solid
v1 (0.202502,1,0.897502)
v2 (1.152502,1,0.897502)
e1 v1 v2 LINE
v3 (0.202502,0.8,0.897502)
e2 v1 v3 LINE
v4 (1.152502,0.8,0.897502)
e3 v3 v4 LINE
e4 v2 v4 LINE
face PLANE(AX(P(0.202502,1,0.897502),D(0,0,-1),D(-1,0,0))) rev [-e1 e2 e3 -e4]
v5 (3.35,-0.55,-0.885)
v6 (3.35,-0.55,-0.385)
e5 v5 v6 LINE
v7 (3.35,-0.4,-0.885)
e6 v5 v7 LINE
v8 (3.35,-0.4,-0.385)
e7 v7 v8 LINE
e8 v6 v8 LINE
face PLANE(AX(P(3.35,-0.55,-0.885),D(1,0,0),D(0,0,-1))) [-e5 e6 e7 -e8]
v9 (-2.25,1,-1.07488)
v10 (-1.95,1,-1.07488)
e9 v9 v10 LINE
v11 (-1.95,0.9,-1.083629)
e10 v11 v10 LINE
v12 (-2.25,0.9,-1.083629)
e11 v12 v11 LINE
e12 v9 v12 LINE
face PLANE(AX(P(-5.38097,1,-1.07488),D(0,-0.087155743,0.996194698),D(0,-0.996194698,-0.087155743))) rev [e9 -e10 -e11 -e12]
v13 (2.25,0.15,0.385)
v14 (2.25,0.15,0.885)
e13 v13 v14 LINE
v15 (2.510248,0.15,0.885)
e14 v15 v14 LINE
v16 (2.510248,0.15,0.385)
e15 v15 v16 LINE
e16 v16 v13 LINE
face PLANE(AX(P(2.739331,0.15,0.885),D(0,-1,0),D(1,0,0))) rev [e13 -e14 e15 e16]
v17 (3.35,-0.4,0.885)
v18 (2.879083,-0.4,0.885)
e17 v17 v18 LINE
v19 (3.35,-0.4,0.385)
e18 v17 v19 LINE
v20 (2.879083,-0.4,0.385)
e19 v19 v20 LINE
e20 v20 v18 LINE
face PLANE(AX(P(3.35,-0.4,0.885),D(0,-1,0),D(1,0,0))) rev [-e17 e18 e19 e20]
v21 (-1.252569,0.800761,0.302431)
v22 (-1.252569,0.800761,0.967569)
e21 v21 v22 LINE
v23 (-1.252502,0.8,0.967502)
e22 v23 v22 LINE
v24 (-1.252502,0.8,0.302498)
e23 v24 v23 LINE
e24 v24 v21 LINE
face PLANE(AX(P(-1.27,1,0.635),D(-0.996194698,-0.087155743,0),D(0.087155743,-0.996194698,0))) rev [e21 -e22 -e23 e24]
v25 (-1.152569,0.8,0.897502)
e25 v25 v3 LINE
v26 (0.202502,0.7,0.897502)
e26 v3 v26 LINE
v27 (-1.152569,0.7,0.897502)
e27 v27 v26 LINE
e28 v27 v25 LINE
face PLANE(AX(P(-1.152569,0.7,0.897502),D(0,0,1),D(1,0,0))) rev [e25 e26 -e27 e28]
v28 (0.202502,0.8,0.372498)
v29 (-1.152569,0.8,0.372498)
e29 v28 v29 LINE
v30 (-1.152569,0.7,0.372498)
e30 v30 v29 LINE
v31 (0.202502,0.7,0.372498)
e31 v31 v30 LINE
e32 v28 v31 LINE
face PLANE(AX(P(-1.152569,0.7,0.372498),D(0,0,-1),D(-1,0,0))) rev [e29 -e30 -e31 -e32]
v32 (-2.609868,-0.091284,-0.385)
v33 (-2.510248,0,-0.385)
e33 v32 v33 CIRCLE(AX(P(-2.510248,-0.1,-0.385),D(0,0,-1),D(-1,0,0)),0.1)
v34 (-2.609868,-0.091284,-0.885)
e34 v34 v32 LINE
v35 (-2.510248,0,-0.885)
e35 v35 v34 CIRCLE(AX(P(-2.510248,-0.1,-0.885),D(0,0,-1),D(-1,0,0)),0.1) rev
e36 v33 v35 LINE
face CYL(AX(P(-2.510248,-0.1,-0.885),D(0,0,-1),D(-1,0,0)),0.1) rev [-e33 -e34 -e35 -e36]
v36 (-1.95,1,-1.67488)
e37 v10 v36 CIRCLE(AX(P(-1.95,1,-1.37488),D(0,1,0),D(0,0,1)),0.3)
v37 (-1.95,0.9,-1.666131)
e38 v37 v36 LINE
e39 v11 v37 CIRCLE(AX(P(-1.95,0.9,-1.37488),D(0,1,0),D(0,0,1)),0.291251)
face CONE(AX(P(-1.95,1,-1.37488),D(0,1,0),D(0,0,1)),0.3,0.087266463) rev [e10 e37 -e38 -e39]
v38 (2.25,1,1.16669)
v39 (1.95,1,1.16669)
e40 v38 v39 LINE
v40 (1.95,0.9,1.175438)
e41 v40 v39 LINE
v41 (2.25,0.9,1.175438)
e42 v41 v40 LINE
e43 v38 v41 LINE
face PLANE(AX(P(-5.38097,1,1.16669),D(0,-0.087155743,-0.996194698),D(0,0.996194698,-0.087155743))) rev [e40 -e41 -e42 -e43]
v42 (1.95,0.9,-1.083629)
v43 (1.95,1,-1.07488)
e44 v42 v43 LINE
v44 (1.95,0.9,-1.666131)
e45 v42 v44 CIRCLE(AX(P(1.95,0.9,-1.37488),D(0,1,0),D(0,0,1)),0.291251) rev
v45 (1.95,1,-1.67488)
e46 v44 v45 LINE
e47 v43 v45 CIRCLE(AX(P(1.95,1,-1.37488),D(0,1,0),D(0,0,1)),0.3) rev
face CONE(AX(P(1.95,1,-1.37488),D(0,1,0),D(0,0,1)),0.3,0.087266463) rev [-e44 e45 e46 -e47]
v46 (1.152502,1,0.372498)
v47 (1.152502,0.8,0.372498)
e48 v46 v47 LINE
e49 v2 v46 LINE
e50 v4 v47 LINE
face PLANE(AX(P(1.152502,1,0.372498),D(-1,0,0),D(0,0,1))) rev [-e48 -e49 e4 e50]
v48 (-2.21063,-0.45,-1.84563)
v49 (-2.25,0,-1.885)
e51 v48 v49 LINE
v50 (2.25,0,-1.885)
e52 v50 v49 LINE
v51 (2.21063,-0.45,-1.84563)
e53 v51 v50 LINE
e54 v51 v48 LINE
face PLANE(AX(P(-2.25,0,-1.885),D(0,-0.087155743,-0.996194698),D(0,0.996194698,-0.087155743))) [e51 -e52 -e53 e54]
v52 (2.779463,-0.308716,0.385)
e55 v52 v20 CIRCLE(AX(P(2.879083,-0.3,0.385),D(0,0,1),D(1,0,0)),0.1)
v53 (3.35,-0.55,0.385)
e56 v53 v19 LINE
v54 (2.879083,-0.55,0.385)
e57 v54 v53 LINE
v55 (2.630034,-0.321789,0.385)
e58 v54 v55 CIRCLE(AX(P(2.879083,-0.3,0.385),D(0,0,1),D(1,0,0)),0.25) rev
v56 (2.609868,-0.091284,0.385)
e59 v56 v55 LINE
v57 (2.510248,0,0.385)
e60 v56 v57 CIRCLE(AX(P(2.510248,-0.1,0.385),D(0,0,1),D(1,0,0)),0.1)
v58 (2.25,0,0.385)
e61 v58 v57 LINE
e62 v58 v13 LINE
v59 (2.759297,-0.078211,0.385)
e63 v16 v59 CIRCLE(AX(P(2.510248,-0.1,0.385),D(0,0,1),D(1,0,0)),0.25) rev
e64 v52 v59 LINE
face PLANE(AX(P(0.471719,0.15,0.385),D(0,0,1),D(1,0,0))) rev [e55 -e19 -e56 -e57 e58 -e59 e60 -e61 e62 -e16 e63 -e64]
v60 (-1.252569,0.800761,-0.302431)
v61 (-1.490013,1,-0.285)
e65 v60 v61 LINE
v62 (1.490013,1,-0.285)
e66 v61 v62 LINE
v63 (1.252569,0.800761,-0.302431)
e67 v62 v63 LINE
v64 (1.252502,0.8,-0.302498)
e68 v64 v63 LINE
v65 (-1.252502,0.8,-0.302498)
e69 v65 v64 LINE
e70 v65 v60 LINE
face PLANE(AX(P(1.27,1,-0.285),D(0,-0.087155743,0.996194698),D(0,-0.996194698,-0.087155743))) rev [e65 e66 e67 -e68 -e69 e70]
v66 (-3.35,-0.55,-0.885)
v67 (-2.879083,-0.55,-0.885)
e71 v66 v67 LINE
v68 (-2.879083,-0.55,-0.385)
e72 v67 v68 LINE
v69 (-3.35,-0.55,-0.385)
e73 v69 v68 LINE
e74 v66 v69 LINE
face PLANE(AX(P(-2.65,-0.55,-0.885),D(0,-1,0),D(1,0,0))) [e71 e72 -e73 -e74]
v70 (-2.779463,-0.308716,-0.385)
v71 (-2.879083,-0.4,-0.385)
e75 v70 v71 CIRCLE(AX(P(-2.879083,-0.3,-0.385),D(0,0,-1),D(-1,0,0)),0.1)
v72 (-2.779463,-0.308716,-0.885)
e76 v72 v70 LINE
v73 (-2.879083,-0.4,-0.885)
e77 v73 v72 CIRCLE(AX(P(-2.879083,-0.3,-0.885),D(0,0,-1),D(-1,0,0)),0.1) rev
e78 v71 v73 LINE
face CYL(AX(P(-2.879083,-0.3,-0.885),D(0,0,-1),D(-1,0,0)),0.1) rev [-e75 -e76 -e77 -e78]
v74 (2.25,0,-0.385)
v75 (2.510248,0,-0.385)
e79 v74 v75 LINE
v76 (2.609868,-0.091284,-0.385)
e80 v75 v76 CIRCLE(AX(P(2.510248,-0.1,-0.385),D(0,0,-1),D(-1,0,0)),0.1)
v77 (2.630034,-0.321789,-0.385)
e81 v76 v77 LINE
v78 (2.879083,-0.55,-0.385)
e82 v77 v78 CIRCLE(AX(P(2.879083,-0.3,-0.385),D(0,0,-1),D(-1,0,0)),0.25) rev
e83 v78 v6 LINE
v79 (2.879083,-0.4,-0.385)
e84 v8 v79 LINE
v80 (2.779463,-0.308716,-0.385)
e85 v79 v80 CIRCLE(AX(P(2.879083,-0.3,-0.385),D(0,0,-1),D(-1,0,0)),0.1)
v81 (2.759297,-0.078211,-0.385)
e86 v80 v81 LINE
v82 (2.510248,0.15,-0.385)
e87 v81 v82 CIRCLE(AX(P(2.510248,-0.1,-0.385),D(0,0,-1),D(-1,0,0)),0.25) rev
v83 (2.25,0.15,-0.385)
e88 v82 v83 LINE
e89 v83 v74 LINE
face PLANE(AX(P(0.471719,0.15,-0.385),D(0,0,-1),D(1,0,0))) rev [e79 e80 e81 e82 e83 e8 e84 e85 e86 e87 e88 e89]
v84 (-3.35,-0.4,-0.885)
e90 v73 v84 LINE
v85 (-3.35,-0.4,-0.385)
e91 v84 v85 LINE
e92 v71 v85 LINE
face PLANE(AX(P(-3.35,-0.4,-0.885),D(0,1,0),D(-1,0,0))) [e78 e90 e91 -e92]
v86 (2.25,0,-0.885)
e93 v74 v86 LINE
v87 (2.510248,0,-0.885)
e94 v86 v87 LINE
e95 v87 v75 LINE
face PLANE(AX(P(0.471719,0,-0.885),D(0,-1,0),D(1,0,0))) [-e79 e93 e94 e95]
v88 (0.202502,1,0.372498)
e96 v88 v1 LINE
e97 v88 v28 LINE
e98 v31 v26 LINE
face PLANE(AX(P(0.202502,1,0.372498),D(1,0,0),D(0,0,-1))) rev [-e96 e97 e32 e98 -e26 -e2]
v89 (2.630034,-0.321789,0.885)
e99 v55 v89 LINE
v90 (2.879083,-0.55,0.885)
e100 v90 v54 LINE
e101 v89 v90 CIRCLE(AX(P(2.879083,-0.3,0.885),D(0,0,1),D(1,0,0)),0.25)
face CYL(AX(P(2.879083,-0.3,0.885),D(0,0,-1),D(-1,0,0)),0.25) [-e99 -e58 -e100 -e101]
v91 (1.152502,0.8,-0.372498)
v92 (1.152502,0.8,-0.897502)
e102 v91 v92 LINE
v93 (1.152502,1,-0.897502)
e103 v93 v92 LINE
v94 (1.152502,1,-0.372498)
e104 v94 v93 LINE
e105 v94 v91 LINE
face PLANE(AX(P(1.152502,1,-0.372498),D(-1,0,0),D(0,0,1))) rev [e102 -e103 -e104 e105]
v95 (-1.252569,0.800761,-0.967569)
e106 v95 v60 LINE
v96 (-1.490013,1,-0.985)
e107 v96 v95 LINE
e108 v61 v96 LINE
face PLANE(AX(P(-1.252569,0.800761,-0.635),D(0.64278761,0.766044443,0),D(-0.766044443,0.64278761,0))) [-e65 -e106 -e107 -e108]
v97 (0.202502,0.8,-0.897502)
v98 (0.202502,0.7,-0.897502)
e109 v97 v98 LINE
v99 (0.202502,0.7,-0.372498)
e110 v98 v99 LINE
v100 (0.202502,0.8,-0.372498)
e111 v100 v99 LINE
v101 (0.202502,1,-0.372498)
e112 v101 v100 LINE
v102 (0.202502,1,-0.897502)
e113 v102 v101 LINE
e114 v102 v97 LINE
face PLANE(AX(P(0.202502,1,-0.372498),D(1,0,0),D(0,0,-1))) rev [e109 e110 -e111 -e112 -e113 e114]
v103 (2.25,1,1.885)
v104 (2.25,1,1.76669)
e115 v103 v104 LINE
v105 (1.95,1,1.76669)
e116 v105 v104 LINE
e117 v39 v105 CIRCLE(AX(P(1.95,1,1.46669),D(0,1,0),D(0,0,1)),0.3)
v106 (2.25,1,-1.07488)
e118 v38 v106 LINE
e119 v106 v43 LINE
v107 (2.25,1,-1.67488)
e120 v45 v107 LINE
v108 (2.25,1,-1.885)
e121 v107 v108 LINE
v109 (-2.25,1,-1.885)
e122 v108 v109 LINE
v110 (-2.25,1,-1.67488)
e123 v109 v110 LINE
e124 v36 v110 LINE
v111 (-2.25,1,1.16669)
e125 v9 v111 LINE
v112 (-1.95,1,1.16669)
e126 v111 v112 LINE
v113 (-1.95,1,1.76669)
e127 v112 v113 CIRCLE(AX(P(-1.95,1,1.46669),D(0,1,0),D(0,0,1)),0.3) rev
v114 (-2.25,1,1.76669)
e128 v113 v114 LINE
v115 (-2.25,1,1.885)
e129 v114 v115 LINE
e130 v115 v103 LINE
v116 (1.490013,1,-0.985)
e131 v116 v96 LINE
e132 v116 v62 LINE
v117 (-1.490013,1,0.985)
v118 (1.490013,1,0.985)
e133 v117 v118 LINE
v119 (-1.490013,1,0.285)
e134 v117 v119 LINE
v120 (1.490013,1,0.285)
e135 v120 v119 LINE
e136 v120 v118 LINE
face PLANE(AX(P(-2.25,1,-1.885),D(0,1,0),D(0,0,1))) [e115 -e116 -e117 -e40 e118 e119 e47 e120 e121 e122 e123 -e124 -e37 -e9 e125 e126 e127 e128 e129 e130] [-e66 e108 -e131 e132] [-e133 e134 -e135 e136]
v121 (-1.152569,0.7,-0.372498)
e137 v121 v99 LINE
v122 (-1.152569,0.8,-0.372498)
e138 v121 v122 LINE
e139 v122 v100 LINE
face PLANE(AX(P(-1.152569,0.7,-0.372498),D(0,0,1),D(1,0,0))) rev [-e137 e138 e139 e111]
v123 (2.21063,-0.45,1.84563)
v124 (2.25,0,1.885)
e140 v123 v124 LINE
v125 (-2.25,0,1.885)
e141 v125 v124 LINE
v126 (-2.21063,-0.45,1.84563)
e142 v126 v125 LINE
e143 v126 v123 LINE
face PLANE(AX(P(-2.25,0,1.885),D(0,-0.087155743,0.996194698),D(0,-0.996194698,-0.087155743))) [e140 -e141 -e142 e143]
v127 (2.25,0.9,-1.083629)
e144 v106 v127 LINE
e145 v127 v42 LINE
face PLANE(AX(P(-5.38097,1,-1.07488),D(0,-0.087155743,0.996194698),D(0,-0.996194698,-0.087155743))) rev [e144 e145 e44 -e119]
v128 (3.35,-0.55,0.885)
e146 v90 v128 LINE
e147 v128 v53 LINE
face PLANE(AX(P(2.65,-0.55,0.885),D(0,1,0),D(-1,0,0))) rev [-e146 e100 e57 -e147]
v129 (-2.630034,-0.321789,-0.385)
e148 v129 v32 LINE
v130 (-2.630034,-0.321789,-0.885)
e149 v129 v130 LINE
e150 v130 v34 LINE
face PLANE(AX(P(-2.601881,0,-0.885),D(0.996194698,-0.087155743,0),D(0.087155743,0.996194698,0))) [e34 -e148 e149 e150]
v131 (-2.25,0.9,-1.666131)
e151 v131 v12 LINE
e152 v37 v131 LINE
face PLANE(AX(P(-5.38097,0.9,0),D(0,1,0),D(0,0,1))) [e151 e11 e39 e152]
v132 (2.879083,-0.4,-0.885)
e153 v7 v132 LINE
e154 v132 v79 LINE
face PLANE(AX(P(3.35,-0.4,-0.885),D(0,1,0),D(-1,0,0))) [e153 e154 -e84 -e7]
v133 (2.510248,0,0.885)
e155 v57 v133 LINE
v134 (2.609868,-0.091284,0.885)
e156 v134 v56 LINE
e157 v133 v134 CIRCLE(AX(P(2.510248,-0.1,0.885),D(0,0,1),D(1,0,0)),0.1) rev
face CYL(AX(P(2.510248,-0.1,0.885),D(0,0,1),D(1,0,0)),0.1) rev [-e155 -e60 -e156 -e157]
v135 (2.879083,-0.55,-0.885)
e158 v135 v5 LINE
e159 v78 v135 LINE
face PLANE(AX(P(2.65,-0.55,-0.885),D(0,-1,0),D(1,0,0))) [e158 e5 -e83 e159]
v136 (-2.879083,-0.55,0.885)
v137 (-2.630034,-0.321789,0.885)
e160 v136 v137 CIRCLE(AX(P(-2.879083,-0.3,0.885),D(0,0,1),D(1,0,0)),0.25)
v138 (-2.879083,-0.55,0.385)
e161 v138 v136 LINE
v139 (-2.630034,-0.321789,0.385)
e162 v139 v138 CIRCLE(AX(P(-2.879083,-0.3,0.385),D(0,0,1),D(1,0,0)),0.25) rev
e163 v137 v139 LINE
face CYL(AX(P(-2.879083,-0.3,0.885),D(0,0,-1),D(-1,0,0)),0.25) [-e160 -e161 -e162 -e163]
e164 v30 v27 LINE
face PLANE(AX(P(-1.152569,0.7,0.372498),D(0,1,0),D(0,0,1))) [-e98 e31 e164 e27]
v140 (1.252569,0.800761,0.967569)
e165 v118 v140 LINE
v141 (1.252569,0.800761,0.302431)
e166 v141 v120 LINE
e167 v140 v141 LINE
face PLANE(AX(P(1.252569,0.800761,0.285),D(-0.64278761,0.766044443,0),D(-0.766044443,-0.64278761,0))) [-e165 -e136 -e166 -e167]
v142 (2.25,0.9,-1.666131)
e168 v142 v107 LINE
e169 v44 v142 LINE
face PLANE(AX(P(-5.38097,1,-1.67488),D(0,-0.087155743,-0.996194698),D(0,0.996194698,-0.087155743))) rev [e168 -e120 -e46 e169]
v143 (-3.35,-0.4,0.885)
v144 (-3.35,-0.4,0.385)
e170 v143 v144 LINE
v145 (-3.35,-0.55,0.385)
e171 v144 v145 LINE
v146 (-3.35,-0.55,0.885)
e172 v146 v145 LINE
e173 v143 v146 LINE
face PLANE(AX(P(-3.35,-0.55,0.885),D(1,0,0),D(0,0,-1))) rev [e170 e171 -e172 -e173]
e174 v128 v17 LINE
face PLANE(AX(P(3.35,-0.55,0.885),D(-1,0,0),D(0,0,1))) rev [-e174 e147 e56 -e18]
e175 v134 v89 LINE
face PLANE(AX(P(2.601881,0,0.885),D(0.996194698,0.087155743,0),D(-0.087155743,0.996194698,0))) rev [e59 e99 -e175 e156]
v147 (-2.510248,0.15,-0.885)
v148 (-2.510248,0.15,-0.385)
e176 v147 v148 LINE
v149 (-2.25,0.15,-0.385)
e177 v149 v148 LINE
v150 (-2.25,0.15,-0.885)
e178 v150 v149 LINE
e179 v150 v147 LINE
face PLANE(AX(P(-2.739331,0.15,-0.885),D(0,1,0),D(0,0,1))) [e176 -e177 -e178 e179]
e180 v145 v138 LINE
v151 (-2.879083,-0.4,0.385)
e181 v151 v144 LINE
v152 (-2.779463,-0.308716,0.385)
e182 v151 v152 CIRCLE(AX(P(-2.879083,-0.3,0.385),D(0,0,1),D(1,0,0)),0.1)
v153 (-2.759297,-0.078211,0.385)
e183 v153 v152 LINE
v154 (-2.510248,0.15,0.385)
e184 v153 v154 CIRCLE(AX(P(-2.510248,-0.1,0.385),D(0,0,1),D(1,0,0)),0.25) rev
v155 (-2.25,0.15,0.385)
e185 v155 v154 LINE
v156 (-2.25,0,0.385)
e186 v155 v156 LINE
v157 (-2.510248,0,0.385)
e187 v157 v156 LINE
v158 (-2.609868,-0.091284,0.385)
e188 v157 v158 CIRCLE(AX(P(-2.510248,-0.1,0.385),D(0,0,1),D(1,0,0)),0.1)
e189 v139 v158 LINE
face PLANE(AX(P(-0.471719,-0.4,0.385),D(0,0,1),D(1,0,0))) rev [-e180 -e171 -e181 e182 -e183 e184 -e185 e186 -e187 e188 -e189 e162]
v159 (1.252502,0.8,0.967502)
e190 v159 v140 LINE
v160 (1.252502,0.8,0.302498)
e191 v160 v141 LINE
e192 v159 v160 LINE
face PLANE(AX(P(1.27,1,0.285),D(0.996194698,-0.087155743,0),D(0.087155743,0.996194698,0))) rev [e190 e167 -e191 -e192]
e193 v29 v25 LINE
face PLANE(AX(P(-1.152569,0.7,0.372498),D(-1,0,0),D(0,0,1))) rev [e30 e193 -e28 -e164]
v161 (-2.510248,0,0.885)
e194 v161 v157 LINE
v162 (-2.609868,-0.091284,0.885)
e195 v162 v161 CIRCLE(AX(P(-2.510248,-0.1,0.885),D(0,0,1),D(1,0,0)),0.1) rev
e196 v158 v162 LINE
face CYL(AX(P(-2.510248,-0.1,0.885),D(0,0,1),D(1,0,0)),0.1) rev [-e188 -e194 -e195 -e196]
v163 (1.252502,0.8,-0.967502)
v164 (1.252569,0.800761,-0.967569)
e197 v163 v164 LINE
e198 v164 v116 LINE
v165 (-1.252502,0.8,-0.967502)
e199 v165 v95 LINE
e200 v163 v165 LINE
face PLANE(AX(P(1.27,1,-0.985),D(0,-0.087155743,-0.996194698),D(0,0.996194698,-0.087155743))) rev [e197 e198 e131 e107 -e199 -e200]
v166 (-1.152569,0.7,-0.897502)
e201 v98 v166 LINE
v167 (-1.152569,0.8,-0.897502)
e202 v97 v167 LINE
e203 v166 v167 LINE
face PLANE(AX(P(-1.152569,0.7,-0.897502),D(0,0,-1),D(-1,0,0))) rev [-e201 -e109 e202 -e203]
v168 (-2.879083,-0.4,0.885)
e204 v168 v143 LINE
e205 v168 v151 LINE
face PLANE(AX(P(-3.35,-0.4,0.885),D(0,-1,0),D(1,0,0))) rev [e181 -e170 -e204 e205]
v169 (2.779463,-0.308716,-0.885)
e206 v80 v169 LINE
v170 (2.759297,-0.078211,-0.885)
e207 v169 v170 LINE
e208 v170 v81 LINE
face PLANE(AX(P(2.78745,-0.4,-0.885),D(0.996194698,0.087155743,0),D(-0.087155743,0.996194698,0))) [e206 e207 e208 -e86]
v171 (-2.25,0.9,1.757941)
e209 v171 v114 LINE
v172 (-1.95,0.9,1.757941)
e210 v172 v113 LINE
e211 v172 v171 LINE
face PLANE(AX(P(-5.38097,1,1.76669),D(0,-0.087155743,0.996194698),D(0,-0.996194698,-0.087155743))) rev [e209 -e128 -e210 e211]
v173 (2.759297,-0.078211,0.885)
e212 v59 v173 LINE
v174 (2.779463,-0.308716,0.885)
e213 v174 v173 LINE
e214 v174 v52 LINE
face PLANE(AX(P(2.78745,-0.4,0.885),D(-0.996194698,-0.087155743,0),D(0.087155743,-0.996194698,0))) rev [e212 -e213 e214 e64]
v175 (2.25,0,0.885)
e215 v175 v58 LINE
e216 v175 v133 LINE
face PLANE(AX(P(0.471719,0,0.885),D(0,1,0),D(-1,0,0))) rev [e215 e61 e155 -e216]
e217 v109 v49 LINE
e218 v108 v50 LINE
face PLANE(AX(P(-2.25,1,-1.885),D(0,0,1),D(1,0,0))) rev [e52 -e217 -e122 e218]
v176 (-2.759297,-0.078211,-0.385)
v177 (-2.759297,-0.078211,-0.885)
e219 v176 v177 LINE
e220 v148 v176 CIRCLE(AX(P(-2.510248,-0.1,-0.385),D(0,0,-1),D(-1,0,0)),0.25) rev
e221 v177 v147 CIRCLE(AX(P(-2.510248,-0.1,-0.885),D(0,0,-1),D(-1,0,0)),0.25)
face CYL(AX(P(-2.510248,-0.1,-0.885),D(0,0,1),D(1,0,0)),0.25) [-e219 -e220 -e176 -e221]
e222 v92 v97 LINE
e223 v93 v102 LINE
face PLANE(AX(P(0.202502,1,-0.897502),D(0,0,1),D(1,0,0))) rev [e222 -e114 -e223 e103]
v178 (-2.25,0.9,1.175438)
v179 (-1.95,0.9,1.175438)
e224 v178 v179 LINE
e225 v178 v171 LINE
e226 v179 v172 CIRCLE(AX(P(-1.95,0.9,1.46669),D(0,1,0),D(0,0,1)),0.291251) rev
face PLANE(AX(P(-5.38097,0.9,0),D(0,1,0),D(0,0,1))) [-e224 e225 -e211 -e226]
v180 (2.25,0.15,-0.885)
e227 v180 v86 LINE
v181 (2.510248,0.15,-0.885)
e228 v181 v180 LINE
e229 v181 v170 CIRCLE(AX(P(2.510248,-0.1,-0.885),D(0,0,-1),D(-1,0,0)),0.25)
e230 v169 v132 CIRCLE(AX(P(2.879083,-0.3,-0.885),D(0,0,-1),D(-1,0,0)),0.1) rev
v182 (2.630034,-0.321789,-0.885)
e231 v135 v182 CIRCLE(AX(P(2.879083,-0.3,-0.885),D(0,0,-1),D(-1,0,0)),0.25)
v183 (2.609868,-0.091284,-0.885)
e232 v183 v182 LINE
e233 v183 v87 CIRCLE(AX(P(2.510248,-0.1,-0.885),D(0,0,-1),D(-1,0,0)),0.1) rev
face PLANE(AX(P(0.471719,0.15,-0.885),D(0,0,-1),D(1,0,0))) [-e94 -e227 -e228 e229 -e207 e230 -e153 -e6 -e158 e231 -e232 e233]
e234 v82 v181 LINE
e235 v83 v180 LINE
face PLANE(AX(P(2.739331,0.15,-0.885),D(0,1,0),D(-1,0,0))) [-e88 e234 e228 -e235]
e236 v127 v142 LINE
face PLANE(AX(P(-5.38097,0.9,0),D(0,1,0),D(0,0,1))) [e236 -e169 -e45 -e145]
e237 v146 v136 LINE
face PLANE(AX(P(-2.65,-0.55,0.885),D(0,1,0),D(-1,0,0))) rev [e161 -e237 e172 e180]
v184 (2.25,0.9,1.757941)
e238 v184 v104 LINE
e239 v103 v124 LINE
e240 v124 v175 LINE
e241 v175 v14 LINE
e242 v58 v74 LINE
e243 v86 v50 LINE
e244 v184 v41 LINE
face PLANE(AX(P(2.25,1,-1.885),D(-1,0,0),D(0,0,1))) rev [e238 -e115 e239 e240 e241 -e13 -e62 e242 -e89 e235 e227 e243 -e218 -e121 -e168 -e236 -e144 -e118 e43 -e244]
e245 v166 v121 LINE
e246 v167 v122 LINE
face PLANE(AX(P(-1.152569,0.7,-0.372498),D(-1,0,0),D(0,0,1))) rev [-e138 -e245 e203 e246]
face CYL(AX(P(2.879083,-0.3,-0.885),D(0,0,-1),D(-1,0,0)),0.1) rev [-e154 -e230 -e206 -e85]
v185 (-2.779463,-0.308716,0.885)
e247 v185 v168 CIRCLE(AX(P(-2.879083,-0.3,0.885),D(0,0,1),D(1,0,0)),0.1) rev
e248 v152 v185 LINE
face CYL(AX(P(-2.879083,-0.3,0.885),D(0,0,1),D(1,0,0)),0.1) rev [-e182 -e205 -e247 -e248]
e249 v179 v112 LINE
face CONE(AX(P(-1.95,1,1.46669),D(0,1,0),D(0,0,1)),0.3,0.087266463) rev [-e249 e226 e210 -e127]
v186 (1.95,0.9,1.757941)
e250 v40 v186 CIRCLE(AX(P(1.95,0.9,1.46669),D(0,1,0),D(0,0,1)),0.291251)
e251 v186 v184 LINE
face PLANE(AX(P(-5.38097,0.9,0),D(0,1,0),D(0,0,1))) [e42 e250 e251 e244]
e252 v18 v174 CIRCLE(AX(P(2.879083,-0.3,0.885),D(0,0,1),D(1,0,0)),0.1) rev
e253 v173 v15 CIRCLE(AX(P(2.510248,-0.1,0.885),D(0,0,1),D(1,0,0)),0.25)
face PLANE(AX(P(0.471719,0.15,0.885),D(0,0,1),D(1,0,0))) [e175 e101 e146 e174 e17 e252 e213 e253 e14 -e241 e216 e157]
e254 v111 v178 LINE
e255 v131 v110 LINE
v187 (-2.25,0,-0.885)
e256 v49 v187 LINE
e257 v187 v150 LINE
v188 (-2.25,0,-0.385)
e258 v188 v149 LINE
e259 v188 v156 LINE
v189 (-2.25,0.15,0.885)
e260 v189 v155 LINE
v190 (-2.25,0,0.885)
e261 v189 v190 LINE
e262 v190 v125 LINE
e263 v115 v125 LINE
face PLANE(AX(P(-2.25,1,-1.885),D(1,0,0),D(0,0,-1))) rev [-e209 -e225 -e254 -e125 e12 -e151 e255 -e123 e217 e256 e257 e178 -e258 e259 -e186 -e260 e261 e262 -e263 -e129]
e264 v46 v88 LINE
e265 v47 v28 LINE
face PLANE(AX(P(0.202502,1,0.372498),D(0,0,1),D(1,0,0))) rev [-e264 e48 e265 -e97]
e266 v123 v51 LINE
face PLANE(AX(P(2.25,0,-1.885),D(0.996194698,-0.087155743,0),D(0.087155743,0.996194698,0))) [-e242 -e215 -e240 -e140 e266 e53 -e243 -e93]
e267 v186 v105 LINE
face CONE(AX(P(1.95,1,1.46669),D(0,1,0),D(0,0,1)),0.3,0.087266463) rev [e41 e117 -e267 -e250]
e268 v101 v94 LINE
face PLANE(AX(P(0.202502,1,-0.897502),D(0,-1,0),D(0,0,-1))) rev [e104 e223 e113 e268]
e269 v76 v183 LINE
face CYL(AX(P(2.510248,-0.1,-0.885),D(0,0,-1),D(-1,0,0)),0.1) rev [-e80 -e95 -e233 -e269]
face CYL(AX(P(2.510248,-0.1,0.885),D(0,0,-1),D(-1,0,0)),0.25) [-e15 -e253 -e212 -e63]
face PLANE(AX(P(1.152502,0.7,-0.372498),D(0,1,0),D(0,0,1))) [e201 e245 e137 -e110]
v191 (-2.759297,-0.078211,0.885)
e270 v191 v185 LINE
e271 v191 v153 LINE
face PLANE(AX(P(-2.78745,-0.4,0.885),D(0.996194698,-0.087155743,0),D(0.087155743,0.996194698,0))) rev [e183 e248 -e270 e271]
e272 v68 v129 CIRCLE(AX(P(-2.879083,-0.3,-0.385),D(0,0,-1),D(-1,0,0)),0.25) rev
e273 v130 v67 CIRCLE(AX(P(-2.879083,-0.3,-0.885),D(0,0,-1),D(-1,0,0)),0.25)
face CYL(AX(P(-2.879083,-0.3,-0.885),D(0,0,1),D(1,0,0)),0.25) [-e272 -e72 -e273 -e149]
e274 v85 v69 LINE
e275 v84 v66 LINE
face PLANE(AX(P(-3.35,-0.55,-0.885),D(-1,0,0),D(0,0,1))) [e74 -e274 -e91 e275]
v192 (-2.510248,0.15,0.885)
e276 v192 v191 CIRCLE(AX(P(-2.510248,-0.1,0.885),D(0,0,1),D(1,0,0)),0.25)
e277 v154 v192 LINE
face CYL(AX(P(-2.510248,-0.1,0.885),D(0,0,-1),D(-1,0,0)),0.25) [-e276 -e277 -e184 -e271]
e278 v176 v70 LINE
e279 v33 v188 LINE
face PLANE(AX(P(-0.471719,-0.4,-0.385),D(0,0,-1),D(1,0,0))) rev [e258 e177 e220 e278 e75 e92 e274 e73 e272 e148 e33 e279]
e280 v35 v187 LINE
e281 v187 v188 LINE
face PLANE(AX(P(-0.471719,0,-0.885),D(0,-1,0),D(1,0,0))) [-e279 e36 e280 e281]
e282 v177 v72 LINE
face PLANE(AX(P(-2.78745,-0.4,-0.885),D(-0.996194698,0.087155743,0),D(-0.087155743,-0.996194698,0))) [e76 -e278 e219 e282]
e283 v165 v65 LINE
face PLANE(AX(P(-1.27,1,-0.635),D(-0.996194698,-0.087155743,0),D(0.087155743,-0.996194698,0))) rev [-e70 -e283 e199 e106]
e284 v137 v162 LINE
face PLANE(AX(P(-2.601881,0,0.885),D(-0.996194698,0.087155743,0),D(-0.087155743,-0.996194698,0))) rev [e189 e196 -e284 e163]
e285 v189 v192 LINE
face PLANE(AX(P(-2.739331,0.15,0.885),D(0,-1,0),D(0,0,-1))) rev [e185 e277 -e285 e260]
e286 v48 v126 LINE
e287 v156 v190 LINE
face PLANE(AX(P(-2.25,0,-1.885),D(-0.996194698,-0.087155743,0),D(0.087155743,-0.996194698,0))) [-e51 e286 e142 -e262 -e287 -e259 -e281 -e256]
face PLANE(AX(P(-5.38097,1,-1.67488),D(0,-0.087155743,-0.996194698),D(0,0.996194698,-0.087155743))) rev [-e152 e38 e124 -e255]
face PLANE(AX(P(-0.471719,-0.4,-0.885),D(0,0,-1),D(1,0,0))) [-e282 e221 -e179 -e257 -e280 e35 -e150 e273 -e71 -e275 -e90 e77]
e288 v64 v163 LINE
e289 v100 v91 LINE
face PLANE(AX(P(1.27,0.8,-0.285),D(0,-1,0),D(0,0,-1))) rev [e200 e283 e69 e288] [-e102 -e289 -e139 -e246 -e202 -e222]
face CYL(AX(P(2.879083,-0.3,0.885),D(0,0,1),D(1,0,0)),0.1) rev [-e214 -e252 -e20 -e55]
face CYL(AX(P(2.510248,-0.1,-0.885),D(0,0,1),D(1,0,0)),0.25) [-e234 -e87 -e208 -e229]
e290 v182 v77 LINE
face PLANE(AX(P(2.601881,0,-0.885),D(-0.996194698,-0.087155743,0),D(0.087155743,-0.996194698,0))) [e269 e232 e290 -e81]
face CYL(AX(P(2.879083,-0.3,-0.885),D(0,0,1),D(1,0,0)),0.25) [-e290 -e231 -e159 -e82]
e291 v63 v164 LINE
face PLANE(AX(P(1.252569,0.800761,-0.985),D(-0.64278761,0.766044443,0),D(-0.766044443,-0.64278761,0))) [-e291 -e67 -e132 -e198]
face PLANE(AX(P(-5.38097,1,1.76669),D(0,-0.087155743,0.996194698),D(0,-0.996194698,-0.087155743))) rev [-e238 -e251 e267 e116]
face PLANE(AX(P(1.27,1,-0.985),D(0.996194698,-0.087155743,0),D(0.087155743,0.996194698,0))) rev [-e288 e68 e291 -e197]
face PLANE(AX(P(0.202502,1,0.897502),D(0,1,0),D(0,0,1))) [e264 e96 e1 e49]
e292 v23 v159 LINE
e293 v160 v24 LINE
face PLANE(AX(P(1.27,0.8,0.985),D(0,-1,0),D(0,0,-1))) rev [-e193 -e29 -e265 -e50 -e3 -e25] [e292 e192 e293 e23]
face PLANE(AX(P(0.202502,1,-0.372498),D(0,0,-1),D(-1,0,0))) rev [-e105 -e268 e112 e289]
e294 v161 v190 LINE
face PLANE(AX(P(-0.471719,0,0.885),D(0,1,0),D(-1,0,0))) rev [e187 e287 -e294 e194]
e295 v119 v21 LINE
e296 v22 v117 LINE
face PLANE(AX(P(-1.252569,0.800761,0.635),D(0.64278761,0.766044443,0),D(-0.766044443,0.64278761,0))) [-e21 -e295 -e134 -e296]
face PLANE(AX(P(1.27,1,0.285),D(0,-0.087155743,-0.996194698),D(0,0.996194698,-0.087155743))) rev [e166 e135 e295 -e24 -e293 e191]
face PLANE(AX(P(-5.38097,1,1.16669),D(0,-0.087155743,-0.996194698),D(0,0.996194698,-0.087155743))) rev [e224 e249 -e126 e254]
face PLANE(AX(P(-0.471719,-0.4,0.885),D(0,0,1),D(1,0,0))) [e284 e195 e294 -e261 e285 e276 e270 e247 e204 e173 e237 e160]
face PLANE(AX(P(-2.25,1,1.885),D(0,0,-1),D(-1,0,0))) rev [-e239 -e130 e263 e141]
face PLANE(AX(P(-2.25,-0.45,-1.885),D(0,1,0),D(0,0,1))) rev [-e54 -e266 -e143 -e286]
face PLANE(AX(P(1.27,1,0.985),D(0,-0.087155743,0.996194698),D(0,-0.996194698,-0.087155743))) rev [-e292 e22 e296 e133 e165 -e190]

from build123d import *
from OCP.BRepFilletAPI import BRepFilletAPI_MakeChamfer

# Parameters (mm, degrees)
SKETCH1_W                    = 4.5
SKETCH1_H                    = 3.77
EXTRUDE1_DEPTH               = 1
EXTRUDE1_OTHER_WAY_DEPTH     = 0.45
EXTRUDE1_OTHER_WAY_TAPER     = 5
EXTRUDE2_START               = 0.635
EXTRUDE2_DEPTH               = 0.25
FILLET1_R                    = 0.1
FILLET2_R                    = 0.25
CUT_EXTRUDE2_DEPTH           = 0.1
CUT_EXTRUDE2_DRAFT           = -5
CUT_EXTRUDE2_2_DEPTH         = 0.1
CUT_EXTRUDE2_2_DRAFT         = -5
CUT_EXTRUDE2_3_DEPTH         = 0.1
CUT_EXTRUDE2_3_DRAFT         = -5
CUT_EXTRUDE2_4_DEPTH         = 0.1
CUT_EXTRUDE2_4_DRAFT         = -5
CUT_EXTRUDE3_DEPTH           = 0.2
CUT_EXTRUDE3_DRAFT           = -5
CUT_EXTRUDE3_PROFILE_2_DEPTH = 0.2
CUT_EXTRUDE3_PROFILE_2_DRAFT = -5
CHAMFER1_SIZE                = 0.2
CHAMFER1_SIZE2               = 0.220012574
SKETCH5_W                    = 2.305071118
SKETCH5_H                    = 0.525004534
CUT_EXTRUDE4_DEPTH           = 0.1
SKETCH6_W                    = 0.95
SKETCH6_H                    = 0.525004534
EXTRUDE3_DEPTH               = 0.3


# Read off the part's stored shape, not the designer's step: Cut-Extrude2
with BuildPart() as part:
    # Sketch1 → Extrude1 (new body)
    with BuildSketch(Plane(origin=(0, 0, 0), x_dir=(1, 0, 0), z_dir=(0, 1, 0))):
        Rectangle(SKETCH1_W, SKETCH1_H)
    extrude(amount=EXTRUDE1_DEPTH)

    # Sketch1 → Extrude1 other way (add)
    with BuildSketch(Plane(origin=(0, 0, 0), x_dir=(1, 0, 0), z_dir=(0, 1, 0))):
        Rectangle(SKETCH1_W, SKETCH1_H)
    extrude(amount=-EXTRUDE1_OTHER_WAY_DEPTH, taper=EXTRUDE1_OTHER_WAY_TAPER)

    # Sketch2 → Extrude2 (add, symmetric)
    with BuildSketch(Plane.XY.offset(EXTRUDE2_START)):
        Polygon((-0.471718642, 0), (-2.601881235, 0), (-2.65, -0.55), (-3.35, -0.55), (-3.35, -0.4), (-2.787449676, -0.4), (-2.739330911, 0.15), (-0.471718642, 0.15), align=None)
        Polygon((0.471718642, 0.15), (0.471718642, 0), (2.601881235, 0), (2.65, -0.55), (3.35, -0.55), (3.35, -0.4), (2.787449676, -0.4), (2.739330911, 0.15), align=None)
    extrude2 = extrude(amount=EXTRUDE2_DEPTH, both=True)

    # Mirror1: Extrude2 across plane
    add(extrude2.mirror(Plane.XY))

    # Fillet1
    fillet1_edges = [part.edges().sort_by_distance(p)[0] for p in [
        (2.787449676, -0.4, -0.635),
        (2.601881235, 0, -0.635),
        (-2.787449676, -0.4, 0.635),
        (-2.601881235, 0, 0.635),
        (2.601881235, 0, 0.635),
        (2.787449676, -0.4, 0.635),
        (-2.601881235, 0, -0.635),
        (-2.787449676, -0.4, -0.635),
    ]]
    fillet(fillet1_edges, radius=FILLET1_R)

    # Fillet2
    fillet2_edges = [part.edges().sort_by_distance(p)[0] for p in [
        (2.739330911, 0.15, -0.635),
        (2.65, -0.55, -0.635),
        (-2.739330911, 0.15, 0.635),
        (-2.65, -0.55, 0.635),
        (2.739330911, 0.15, 0.635),
        (2.65, -0.55, 0.635),
        (-2.739330911, 0.15, -0.635),
        (-2.65, -0.55, -0.635),
    ]]
    fillet(fillet2_edges, radius=FILLET2_R)


with BuildPart() as cut_extrude2_tool:
    # Cut-Extrude2 outline → Cut-Extrude2 (with draft: the straight prism first)
    with BuildSketch(Plane(origin=(0, 0.9, 0), x_dir=(-1, 0, 0), z_dir=(0, 1, 0))):
        with BuildLine():
            Line((2.25, 1.175438394), (2.25, 1.757940661))
            Line((2.25, 1.757940661), (1.95, 1.757940661))
            ThreePointArc((1.95, 1.757940661), (1.658748866, 1.466689528), (1.95, 1.175438394))
            Line((1.95, 1.175438394), (2.25, 1.175438394))
        make_face()
    extrude(amount=CUT_EXTRUDE2_DEPTH)
    # Cut-Extrude2: the draft: its side faces are tilted about the plane it starts from
    cut_extrude2_sides = [cut_extrude2_tool.faces().sort_by_distance(p)[0] for p in [
        (-2.1, 0.95, 1.175438394),
        (-2.25, 0.95, 1.466689527),
        (-2.1, 0.95, 1.757940661),
        (-1.658748866, 0.95, 1.466689528),
    ]]
    draft(cut_extrude2_sides, Plane(origin=(0, 0.9, 0), x_dir=(-1, 0, 0), z_dir=(0, 1, 0)), CUT_EXTRUDE2_DRAFT)


with BuildPart() as part_1:
    add(part.part)

    # Cut-Extrude2: cut by cut_extrude2_tool
    add(cut_extrude2_tool.part, mode=Mode.SUBTRACT)


with BuildPart() as cut_extrude2_2_tool:
    # Cut-Extrude2 2 outline → Cut-Extrude2 2 (with draft: the straight prism first)
    with BuildSketch(Plane(origin=(0, 0.9, 0), x_dir=(-1, 0, 0), z_dir=(0, 1, 0))):
        with BuildLine():
            Line((2.25, -1.66613077), (2.25, -1.083628503))
            Line((2.25, -1.083628503), (1.95, -1.083628503))
            ThreePointArc((1.95, -1.083628503), (1.658748866, -1.374879636), (1.95, -1.66613077))
            Line((1.95, -1.66613077), (2.25, -1.66613077))
        make_face()
    extrude(amount=CUT_EXTRUDE2_2_DEPTH)
    # Cut-Extrude2 2: the draft: its side faces are tilted about the plane it starts from
    cut_extrude2_2_sides = [cut_extrude2_2_tool.faces().sort_by_distance(p)[0] for p in [
        (-2.25, 0.95, -1.374879637),
        (-2.1, 0.95, -1.083628503),
        (-1.658748866, 0.95, -1.374879637),
        (-2.1, 0.95, -1.66613077),
    ]]
    draft(cut_extrude2_2_sides, Plane(origin=(0, 0.9, 0), x_dir=(-1, 0, 0), z_dir=(0, 1, 0)), CUT_EXTRUDE2_2_DRAFT)


with BuildPart() as part_2:
    add(part_1.part)

    # Cut-Extrude2 2: cut by cut_extrude2_2_tool
    add(cut_extrude2_2_tool.part, mode=Mode.SUBTRACT)


with BuildPart() as cut_extrude2_3_tool:
    # Cut-Extrude2 3 outline → Cut-Extrude2 3 (with draft: the straight prism first)
    with BuildSketch(Plane(origin=(0, 0.9, 0), x_dir=(-1, 0, 0), z_dir=(0, 1, 0))):
        with BuildLine():
            Line((-2.25, -1.083628503), (-2.25, -1.66613077))
            Line((-2.25, -1.66613077), (-1.95, -1.66613077))
            ThreePointArc((-1.95, -1.66613077), (-1.658748866, -1.374879636), (-1.95, -1.083628503))
            Line((-1.95, -1.083628503), (-2.25, -1.083628503))
        make_face()
    extrude(amount=CUT_EXTRUDE2_3_DEPTH)
    # Cut-Extrude2 3: the draft: its side faces are tilted about the plane it starts from
    cut_extrude2_3_sides = [cut_extrude2_3_tool.faces().sort_by_distance(p)[0] for p in [
        (2.25, 0.95, -1.374879637),
        (2.1, 0.95, -1.66613077),
        (1.658748866, 0.95, -1.374879637),
        (2.1, 0.95, -1.083628503),
    ]]
    draft(cut_extrude2_3_sides, Plane(origin=(0, 0.9, 0), x_dir=(-1, 0, 0), z_dir=(0, 1, 0)), CUT_EXTRUDE2_3_DRAFT)


with BuildPart() as part_3:
    add(part_2.part)

    # Cut-Extrude2 3: cut by cut_extrude2_3_tool
    add(cut_extrude2_3_tool.part, mode=Mode.SUBTRACT)


with BuildPart() as cut_extrude2_4_tool:
    # Cut-Extrude2 4 outline → Cut-Extrude2 4 (with draft: the straight prism first)
    with BuildSketch(Plane(origin=(0, 0.9, 0), x_dir=(-1, 0, 0), z_dir=(0, 1, 0))):
        with BuildLine():
            Line((-2.25, 1.757940661), (-2.25, 1.175438394))
            Line((-2.25, 1.175438394), (-1.95, 1.175438394))
            ThreePointArc((-1.95, 1.175438394), (-1.658748866, 1.466689528), (-1.95, 1.757940661))
            Line((-1.95, 1.757940661), (-2.25, 1.757940661))
        make_face()
    extrude(amount=CUT_EXTRUDE2_4_DEPTH)
    # Cut-Extrude2 4: the draft: its side faces are tilted about the plane it starts from
    cut_extrude2_4_sides = [cut_extrude2_4_tool.faces().sort_by_distance(p)[0] for p in [
        (1.658748866, 0.95, 1.466689528),
        (2.1, 0.95, 1.757940661),
        (2.25, 0.95, 1.466689528),
        (2.1, 0.95, 1.175438394),
    ]]
    draft(cut_extrude2_4_sides, Plane(origin=(0, 0.9, 0), x_dir=(-1, 0, 0), z_dir=(0, 1, 0)), CUT_EXTRUDE2_4_DRAFT)


with BuildPart() as part_4:
    add(part_3.part)

    # Cut-Extrude2 4: cut by cut_extrude2_4_tool
    add(cut_extrude2_4_tool.part, mode=Mode.SUBTRACT)


with BuildPart() as cut_extrude3_tool:
    # Sketch4 → Cut-Extrude3 (with draft: the straight prism first)
    with BuildSketch(Plane(origin=(0, 1, 0), x_dir=(-1, 0, 0), z_dir=(0, 1, 0))):
        Polygon((1.27, 0.635), (1.27, 0.985), (-1.27, 0.985), (-1.27, 0.285), (1.27, 0.285), align=None)
    extrude(amount=-CUT_EXTRUDE3_DEPTH)
    # Cut-Extrude3: the draft: its side faces are tilted about the plane it starts from
    cut_extrude3_sides = [cut_extrude3_tool.faces().sort_by_distance(p)[0] for p in [
        (-1.27, 0.9, 0.635),
        (1.27, 0.9, 0.635),
        (0, 0.9, 0.285),
        (0, 0.9, 0.985),
    ]]
    draft(cut_extrude3_sides, Plane(origin=(0, 1, 0), x_dir=(-1, 0, 0), z_dir=(0, 1, 0)), CUT_EXTRUDE3_DRAFT)


with BuildPart() as part_5:
    add(part_4.part)

    # Cut-Extrude3: cut by cut_extrude3_tool
    add(cut_extrude3_tool.part, mode=Mode.SUBTRACT)


with BuildPart() as cut_extrude3_profile_2_tool:
    # Sketch4 → Cut-Extrude3 profile 2 (with draft: the straight prism first)
    with BuildSketch(Plane(origin=(0, 1, 0), x_dir=(-1, 0, 0), z_dir=(0, 1, 0))):
        Polygon((-1.27, -0.985), (1.27, -0.985), (1.27, -0.635), (1.27, -0.285), (-1.27, -0.285), align=None)
    extrude(amount=-CUT_EXTRUDE3_PROFILE_2_DEPTH)
    # Cut-Extrude3 profile 2: the draft: its side faces are tilted about the plane it starts from
    cut_extrude3_profile_2_sides = [cut_extrude3_profile_2_tool.faces().sort_by_distance(p)[0] for p in [
        (0, 0.9, -0.985),
        (0, 0.9, -0.285),
        (-1.27, 0.9, -0.635),
        (1.27, 0.9, -0.635),
    ]]
    draft(cut_extrude3_profile_2_sides, Plane(origin=(0, 1, 0), x_dir=(-1, 0, 0), z_dir=(0, 1, 0)), CUT_EXTRUDE3_PROFILE_2_DRAFT)


with BuildPart() as part_6:
    add(part_5.part)

    # Cut-Extrude3 profile 2: cut by cut_extrude3_profile_2_tool
    add(cut_extrude3_profile_2_tool.part, mode=Mode.SUBTRACT)

    # Chamfer1: one chamfer whose edges measure the first distance from different faces: ONE call of the kernel's chamfer builder (chamfer() names one face for all edges)
    chamfer1_edges_1 = [part_6.edges().sort_by_distance(p)[0] for p in [
        (1.27, 1, -0.635),
    ]]
    chamfer1_side_1 = [part_6.faces().sort_by_distance(p)[0] for p in [
        (1.2613259, 0.900854587, -0.635),
    ]]
    chamfer1_edges_2 = [part_6.edges().sort_by_distance(p)[0] for p in [
        (-1.27, 1, -0.635),
    ]]
    chamfer1_side_2 = [part_6.faces().sort_by_distance(p)[0] for p in [
        (-1.2613259, 0.900854587, -0.635),
    ]]
    chamfer1_edges_3 = [part_6.edges().sort_by_distance(p)[0] for p in [
        (1.27, 1, 0.635),
    ]]
    chamfer1_side_3 = [part_6.faces().sort_by_distance(p)[0] for p in [
        (1.2613259, 0.900854587, 0.635),
    ]]
    chamfer1_edges_4 = [part_6.edges().sort_by_distance(p)[0] for p in [
        (-1.27, 1, 0.635),
    ]]
    chamfer1_side_4 = [part_6.faces().sort_by_distance(p)[0] for p in [
        (-1.2613259, 0.900854587, 0.635),
    ]]
    chamfer1 = BRepFilletAPI_MakeChamfer(part_6.part.solid().wrapped)
    for e in chamfer1_edges_1:
        chamfer1.Add(CHAMFER1_SIZE, CHAMFER1_SIZE2, e.wrapped, chamfer1_side_1[0].wrapped)  # the first distance lies on this face
    for e in chamfer1_edges_2:
        chamfer1.Add(CHAMFER1_SIZE, CHAMFER1_SIZE2, e.wrapped, chamfer1_side_2[0].wrapped)  # the first distance lies on this face
    for e in chamfer1_edges_3:
        chamfer1.Add(CHAMFER1_SIZE, CHAMFER1_SIZE2, e.wrapped, chamfer1_side_3[0].wrapped)  # the first distance lies on this face
    for e in chamfer1_edges_4:
        chamfer1.Add(CHAMFER1_SIZE, CHAMFER1_SIZE2, e.wrapped, chamfer1_side_4[0].wrapped)  # the first distance lies on this face
    add(Compound.cast(chamfer1.Shape()), mode=Mode.REPLACE)

    # Sketch5 → Cut-Extrude4 (cut)
    with BuildSketch(Plane(origin=(0, 0.8, 0), x_dir=(-1, 0, 0), z_dir=(0, 1, 0))):
        with Locations((3.3292e-05, 0.635)):
            Rectangle(SKETCH5_W, SKETCH5_H)
        with Locations((3.3292e-05, -0.635)):
            Rectangle(SKETCH5_W, SKETCH5_H)
    extrude(amount=-CUT_EXTRUDE4_DEPTH, mode=Mode.SUBTRACT)

    # Sketch6 → Extrude3 (add)
    with BuildSketch(Plane(origin=(0, 0.7, 0), x_dir=(-1, 0, 0), z_dir=(0, 1, 0))):
        with Locations((-0.677502267, 0.635)):
            Rectangle(SKETCH6_W, SKETCH6_H)
        with Locations((-0.677502267, -0.635)):
            Rectangle(SKETCH6_W, SKETCH6_H)
    extrude(amount=EXTRUDE3_DEPTH)


solid = part_6.part
